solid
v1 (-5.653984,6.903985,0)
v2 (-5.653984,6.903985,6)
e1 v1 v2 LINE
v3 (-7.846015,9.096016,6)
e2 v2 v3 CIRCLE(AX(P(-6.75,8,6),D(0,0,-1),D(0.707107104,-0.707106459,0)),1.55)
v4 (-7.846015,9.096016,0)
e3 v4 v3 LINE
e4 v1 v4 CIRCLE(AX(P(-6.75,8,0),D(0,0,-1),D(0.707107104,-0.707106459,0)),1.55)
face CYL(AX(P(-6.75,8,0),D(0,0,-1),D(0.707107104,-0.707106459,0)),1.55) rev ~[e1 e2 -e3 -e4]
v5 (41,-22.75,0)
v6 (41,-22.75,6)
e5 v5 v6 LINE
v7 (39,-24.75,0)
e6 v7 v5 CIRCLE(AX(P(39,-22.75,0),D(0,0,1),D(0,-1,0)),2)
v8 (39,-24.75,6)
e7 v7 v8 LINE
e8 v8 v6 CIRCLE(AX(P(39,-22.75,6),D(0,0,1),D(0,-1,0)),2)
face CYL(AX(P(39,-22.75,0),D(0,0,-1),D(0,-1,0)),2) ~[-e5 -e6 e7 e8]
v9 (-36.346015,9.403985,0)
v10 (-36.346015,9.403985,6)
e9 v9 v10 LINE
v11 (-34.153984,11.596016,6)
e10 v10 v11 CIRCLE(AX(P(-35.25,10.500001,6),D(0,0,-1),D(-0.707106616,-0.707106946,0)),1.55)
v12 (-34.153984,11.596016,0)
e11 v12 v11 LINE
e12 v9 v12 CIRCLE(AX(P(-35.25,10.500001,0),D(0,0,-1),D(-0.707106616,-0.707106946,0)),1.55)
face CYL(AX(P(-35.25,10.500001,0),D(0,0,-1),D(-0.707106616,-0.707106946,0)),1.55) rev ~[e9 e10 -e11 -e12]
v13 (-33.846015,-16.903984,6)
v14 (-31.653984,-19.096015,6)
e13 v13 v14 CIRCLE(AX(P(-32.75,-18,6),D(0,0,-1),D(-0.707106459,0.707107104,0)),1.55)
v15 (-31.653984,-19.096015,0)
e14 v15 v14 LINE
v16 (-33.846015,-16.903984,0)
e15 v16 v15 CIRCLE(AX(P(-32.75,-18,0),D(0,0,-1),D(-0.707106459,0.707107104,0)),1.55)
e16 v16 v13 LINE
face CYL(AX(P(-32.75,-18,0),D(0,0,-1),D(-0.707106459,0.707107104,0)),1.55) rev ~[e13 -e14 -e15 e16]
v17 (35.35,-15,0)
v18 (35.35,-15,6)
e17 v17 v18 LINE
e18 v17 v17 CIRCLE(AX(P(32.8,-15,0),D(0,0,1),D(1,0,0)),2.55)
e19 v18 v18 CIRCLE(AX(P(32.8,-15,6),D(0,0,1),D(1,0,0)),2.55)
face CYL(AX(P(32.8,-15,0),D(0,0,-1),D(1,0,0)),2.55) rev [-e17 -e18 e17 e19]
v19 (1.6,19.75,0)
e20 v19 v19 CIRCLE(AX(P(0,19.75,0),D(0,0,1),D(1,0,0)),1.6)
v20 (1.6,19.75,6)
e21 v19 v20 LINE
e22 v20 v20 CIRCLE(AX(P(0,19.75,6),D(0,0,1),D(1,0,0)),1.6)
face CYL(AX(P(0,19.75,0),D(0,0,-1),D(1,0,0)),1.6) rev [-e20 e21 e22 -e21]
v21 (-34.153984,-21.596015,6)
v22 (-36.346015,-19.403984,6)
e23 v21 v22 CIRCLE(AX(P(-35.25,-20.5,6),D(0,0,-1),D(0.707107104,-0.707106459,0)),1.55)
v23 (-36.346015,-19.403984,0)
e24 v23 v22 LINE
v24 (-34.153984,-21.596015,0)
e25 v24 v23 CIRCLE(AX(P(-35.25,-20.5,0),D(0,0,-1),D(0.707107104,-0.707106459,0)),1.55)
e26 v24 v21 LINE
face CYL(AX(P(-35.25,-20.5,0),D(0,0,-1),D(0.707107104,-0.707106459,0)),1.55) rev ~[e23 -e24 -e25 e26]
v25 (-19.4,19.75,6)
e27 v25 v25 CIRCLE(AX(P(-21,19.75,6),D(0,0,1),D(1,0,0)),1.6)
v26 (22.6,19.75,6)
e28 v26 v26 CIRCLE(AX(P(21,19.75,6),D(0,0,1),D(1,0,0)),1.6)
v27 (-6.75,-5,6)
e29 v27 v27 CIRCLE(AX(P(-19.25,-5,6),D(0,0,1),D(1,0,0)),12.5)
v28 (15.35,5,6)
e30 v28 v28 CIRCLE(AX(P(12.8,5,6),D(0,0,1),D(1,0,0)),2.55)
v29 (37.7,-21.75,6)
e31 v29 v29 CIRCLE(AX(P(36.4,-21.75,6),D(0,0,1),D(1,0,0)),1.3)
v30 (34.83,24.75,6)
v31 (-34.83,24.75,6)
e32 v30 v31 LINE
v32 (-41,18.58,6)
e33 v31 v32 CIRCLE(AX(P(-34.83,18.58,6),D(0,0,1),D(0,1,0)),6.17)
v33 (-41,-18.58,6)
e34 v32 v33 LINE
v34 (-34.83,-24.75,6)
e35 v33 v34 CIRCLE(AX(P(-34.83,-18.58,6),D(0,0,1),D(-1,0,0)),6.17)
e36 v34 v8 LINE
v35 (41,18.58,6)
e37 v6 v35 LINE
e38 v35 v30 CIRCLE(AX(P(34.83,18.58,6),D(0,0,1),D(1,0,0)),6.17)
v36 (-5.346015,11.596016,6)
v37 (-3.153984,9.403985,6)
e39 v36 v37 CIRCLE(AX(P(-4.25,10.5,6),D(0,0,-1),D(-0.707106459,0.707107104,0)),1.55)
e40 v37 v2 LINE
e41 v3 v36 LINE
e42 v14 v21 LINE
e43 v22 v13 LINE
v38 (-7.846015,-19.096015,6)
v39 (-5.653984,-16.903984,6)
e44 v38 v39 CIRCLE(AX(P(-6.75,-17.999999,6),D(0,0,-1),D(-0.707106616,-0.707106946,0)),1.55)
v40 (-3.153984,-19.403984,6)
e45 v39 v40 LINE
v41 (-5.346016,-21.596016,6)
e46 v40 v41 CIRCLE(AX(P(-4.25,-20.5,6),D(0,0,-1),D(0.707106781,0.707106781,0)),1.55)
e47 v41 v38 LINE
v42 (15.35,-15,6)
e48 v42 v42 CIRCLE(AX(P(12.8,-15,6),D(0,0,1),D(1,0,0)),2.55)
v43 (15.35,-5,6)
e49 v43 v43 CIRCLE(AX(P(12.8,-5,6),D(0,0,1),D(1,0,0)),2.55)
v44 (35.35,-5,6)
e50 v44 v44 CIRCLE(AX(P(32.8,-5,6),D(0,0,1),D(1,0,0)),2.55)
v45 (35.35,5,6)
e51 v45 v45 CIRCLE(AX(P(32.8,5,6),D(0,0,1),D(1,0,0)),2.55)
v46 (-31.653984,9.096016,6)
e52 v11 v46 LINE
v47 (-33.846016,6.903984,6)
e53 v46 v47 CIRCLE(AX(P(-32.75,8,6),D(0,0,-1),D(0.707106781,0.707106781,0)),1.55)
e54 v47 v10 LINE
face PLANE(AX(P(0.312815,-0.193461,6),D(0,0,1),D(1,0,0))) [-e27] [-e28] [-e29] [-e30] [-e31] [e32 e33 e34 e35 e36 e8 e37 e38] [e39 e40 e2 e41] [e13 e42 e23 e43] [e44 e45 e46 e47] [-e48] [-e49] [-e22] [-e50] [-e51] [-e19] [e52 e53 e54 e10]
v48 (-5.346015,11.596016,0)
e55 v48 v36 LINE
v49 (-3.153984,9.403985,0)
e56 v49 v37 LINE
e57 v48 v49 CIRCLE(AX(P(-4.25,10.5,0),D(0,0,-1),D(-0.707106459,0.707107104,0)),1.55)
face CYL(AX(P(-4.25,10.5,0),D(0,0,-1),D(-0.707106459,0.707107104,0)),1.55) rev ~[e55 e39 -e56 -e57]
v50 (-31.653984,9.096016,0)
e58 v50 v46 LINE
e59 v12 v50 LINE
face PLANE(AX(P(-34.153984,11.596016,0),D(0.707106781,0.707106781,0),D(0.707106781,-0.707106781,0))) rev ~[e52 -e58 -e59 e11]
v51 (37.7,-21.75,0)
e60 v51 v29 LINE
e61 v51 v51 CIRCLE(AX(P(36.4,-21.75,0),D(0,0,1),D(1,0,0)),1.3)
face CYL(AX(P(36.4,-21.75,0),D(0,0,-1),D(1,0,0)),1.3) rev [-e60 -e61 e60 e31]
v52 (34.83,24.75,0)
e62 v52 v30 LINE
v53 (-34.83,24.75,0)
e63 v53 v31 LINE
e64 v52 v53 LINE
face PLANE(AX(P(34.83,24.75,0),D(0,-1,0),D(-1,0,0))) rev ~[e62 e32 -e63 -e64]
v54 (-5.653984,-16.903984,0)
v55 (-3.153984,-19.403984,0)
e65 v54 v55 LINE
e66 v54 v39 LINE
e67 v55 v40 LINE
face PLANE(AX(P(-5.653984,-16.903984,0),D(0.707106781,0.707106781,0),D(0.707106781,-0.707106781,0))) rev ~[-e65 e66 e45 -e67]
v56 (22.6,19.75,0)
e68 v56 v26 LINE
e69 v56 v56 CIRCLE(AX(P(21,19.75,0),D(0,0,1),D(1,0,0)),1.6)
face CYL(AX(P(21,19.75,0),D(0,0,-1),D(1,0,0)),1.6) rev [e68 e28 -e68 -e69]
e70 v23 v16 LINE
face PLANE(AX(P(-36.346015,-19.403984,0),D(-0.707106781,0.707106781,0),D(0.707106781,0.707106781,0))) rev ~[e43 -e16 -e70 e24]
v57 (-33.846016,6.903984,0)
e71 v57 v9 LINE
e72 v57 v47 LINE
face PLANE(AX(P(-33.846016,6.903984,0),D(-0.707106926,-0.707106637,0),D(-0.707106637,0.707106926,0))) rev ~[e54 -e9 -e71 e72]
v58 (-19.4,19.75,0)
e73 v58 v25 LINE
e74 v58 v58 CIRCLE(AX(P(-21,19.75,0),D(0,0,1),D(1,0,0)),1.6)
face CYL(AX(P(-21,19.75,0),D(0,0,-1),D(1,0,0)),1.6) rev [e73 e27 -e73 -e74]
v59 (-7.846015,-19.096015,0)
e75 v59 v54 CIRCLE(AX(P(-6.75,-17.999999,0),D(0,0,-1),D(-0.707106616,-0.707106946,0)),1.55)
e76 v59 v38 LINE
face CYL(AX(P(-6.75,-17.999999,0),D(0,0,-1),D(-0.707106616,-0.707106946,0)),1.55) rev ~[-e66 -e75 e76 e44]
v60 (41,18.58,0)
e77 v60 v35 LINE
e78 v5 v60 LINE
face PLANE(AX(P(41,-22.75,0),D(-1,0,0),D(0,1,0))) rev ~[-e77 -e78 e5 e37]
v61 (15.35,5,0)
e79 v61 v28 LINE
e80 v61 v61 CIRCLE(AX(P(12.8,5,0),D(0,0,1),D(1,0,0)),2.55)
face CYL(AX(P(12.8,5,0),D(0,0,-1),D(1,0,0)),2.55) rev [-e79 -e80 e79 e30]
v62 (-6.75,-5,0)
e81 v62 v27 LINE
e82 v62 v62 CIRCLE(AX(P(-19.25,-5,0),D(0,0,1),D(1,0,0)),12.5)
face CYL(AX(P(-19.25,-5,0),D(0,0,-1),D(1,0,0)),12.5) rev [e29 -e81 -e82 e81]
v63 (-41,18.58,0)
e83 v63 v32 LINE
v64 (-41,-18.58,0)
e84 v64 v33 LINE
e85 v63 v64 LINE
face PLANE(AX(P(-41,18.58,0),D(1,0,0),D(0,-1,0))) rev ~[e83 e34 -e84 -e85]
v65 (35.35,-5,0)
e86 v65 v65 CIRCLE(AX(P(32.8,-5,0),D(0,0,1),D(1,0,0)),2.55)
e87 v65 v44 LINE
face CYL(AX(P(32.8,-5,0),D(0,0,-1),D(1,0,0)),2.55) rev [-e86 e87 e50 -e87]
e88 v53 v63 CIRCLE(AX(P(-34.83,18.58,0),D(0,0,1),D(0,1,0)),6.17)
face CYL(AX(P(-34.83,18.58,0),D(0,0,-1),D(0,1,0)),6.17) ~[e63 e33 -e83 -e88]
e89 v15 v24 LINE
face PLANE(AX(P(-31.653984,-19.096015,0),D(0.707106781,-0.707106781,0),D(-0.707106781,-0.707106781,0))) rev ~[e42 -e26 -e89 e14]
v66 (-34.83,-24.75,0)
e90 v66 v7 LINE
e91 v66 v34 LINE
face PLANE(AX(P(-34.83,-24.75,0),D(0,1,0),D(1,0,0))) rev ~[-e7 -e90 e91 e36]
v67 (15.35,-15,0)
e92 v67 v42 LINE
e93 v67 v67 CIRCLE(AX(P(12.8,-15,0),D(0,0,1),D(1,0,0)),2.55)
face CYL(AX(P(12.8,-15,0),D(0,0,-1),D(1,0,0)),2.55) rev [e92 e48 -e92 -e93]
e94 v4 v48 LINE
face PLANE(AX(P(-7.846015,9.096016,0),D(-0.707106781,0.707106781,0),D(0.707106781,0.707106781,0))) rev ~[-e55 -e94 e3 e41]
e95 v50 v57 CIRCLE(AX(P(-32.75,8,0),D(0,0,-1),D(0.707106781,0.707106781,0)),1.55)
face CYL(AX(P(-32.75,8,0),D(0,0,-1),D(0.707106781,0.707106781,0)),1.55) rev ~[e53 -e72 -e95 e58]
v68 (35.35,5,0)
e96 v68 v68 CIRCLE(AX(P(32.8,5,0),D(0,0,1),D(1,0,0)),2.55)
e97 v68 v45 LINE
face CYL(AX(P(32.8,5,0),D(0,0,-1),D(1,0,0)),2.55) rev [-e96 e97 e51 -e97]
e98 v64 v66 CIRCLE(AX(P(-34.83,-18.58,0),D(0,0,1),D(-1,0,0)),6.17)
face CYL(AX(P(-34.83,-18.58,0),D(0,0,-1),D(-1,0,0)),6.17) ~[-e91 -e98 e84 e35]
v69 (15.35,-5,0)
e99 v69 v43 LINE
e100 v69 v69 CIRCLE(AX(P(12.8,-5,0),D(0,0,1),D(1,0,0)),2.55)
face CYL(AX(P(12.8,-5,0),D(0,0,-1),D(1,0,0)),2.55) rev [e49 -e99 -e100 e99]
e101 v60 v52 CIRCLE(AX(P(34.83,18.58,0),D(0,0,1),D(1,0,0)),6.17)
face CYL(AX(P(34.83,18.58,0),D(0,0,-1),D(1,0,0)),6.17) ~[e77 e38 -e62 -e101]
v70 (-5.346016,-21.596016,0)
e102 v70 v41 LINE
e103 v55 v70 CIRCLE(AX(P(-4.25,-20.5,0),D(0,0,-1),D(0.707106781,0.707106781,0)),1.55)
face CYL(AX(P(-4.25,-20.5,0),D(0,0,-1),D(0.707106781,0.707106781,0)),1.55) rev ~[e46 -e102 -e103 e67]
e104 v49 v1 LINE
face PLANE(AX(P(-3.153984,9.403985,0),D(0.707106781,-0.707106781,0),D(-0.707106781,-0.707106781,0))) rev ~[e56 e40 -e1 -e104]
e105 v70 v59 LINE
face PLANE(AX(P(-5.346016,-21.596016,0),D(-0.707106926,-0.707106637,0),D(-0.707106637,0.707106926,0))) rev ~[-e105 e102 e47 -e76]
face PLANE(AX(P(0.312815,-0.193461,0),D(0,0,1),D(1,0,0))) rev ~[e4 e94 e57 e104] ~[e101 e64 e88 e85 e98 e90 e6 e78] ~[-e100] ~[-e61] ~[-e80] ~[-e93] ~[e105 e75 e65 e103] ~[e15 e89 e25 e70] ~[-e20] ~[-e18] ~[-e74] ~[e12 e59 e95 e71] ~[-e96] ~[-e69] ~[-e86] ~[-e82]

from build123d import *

# Parameters (mm, degrees)
F0_R     = 12.5
F0_R_2   = 2.55
F0_R_3   = 1.3
F0_R_4   = 1.6
F1_DEPTH = 6


# Not quite as in the source:
# - ends of sketch curves that miss each other by under 0.0002 mm in the source are joined


with BuildPart() as f1:
    # F0 (on Top) → F1 (new body)
    with BuildSketch(Plane.XY):
        with BuildLine():
            Line((34.83, 24.75), (-34.83, 24.75))
            ThreePointArc((-34.83, 24.75), (-39.1928488399, 22.9428488399), (-41, 18.58))
            Line((-41, 18.58), (-41, -18.58))
            ThreePointArc((-41, -18.58), (-39.1928488399, -22.9428488399), (-34.83, -24.75))
            Line((-34.83, -24.75), (39, -24.75))
            ThreePointArc((39, -24.75), (40.4142135624, -24.1642135624), (41, -22.75))
            Line((41, -22.75), (41, 18.58))
            ThreePointArc((41, 18.58), (39.1928488399, 22.9428488399), (34.83, 24.75))
        make_face()
        with BuildLine():
            ThreePointArc((-34.1539839892, -21.5960150108), (-36.3460155108, -21.5960155108), (-36.3460150108, -19.4039839892))
            Line((-36.346015, -19.403984), (-33.846015, -16.903984))
            ThreePointArc((-33.8460150108, -16.9039839892), (-31.6539844892, -16.9039844892), (-31.6539839892, -19.0960150108))
            Line((-31.653984, -19.096015), (-34.153984, -21.596015))
        make_face(mode=Mode.SUBTRACT)
        with BuildLine():
            ThreePointArc((-3.1539844892, -19.4039844892), (-3.1539844892, -21.5960155108), (-5.3460155108, -21.5960155108))
            Line((-5.3460155108, -21.5960155108), (-7.846015, -19.096015))
            ThreePointArc((-7.846015, -19.096015), (-7.8460155108, -16.9039844892), (-5.6539844892, -16.9039844892))
            Line((-5.6539844892, -16.9039844892), (-3.1539844892, -19.4039844892))
        make_face(mode=Mode.SUBTRACT)
        with Locations((-19.25, -5)):
            Circle(F0_R, mode=Mode.SUBTRACT)
        with Locations((12.8, -15)):
            Circle(F0_R_2, mode=Mode.SUBTRACT)
        with Locations((36.4, -21.75)):
            Circle(F0_R_3, mode=Mode.SUBTRACT)
        with Locations((32.8, -15)):
            Circle(F0_R_2, mode=Mode.SUBTRACT)
        with Locations((12.8, -5)):
            Circle(F0_R_2, mode=Mode.SUBTRACT)
        with Locations((32.8, -5)):
            Circle(F0_R_2, mode=Mode.SUBTRACT)
        with BuildLine():
            ThreePointArc((-31.6539844892, 9.0960155108), (-31.6539844892, 6.9039844892), (-33.8460155108, 6.9039844892))
            Line((-33.8460155108, 6.9039844892), (-36.346015, 9.403985))
            ThreePointArc((-36.346015, 9.403985), (-36.3460155108, 11.5960155108), (-34.1539844892, 11.5960155108))
            Line((-34.1539844892, 11.5960155108), (-31.6539844892, 9.0960155108))
        make_face(mode=Mode.SUBTRACT)
        with BuildLine():
            ThreePointArc((-5.3460150108, 11.5960160108), (-3.1539844892, 11.5960155108), (-3.1539839892, 9.4039849892))
            Line((-3.153984, 9.403985), (-5.653984, 6.903985))
            ThreePointArc((-5.6539839892, 6.9039849892), (-7.8460155108, 6.9039844892), (-7.8460150108, 9.0960160108))
            Line((-7.846015, 9.096016), (-5.346015, 11.596016))
        make_face(mode=Mode.SUBTRACT)
        with Locations((-21, 19.75)):
            Circle(F0_R_4, mode=Mode.SUBTRACT)
        with Locations((12.8, 5)):
            Circle(F0_R_2, mode=Mode.SUBTRACT)
        with Locations((32.8, 5)):
            Circle(F0_R_2, mode=Mode.SUBTRACT)
        with Locations((0, 19.75)):
            Circle(F0_R_4, mode=Mode.SUBTRACT)
        with Locations((21, 19.75)):
            Circle(F0_R_4, mode=Mode.SUBTRACT)
    extrude(amount=F1_DEPTH)


solid = f1.part
